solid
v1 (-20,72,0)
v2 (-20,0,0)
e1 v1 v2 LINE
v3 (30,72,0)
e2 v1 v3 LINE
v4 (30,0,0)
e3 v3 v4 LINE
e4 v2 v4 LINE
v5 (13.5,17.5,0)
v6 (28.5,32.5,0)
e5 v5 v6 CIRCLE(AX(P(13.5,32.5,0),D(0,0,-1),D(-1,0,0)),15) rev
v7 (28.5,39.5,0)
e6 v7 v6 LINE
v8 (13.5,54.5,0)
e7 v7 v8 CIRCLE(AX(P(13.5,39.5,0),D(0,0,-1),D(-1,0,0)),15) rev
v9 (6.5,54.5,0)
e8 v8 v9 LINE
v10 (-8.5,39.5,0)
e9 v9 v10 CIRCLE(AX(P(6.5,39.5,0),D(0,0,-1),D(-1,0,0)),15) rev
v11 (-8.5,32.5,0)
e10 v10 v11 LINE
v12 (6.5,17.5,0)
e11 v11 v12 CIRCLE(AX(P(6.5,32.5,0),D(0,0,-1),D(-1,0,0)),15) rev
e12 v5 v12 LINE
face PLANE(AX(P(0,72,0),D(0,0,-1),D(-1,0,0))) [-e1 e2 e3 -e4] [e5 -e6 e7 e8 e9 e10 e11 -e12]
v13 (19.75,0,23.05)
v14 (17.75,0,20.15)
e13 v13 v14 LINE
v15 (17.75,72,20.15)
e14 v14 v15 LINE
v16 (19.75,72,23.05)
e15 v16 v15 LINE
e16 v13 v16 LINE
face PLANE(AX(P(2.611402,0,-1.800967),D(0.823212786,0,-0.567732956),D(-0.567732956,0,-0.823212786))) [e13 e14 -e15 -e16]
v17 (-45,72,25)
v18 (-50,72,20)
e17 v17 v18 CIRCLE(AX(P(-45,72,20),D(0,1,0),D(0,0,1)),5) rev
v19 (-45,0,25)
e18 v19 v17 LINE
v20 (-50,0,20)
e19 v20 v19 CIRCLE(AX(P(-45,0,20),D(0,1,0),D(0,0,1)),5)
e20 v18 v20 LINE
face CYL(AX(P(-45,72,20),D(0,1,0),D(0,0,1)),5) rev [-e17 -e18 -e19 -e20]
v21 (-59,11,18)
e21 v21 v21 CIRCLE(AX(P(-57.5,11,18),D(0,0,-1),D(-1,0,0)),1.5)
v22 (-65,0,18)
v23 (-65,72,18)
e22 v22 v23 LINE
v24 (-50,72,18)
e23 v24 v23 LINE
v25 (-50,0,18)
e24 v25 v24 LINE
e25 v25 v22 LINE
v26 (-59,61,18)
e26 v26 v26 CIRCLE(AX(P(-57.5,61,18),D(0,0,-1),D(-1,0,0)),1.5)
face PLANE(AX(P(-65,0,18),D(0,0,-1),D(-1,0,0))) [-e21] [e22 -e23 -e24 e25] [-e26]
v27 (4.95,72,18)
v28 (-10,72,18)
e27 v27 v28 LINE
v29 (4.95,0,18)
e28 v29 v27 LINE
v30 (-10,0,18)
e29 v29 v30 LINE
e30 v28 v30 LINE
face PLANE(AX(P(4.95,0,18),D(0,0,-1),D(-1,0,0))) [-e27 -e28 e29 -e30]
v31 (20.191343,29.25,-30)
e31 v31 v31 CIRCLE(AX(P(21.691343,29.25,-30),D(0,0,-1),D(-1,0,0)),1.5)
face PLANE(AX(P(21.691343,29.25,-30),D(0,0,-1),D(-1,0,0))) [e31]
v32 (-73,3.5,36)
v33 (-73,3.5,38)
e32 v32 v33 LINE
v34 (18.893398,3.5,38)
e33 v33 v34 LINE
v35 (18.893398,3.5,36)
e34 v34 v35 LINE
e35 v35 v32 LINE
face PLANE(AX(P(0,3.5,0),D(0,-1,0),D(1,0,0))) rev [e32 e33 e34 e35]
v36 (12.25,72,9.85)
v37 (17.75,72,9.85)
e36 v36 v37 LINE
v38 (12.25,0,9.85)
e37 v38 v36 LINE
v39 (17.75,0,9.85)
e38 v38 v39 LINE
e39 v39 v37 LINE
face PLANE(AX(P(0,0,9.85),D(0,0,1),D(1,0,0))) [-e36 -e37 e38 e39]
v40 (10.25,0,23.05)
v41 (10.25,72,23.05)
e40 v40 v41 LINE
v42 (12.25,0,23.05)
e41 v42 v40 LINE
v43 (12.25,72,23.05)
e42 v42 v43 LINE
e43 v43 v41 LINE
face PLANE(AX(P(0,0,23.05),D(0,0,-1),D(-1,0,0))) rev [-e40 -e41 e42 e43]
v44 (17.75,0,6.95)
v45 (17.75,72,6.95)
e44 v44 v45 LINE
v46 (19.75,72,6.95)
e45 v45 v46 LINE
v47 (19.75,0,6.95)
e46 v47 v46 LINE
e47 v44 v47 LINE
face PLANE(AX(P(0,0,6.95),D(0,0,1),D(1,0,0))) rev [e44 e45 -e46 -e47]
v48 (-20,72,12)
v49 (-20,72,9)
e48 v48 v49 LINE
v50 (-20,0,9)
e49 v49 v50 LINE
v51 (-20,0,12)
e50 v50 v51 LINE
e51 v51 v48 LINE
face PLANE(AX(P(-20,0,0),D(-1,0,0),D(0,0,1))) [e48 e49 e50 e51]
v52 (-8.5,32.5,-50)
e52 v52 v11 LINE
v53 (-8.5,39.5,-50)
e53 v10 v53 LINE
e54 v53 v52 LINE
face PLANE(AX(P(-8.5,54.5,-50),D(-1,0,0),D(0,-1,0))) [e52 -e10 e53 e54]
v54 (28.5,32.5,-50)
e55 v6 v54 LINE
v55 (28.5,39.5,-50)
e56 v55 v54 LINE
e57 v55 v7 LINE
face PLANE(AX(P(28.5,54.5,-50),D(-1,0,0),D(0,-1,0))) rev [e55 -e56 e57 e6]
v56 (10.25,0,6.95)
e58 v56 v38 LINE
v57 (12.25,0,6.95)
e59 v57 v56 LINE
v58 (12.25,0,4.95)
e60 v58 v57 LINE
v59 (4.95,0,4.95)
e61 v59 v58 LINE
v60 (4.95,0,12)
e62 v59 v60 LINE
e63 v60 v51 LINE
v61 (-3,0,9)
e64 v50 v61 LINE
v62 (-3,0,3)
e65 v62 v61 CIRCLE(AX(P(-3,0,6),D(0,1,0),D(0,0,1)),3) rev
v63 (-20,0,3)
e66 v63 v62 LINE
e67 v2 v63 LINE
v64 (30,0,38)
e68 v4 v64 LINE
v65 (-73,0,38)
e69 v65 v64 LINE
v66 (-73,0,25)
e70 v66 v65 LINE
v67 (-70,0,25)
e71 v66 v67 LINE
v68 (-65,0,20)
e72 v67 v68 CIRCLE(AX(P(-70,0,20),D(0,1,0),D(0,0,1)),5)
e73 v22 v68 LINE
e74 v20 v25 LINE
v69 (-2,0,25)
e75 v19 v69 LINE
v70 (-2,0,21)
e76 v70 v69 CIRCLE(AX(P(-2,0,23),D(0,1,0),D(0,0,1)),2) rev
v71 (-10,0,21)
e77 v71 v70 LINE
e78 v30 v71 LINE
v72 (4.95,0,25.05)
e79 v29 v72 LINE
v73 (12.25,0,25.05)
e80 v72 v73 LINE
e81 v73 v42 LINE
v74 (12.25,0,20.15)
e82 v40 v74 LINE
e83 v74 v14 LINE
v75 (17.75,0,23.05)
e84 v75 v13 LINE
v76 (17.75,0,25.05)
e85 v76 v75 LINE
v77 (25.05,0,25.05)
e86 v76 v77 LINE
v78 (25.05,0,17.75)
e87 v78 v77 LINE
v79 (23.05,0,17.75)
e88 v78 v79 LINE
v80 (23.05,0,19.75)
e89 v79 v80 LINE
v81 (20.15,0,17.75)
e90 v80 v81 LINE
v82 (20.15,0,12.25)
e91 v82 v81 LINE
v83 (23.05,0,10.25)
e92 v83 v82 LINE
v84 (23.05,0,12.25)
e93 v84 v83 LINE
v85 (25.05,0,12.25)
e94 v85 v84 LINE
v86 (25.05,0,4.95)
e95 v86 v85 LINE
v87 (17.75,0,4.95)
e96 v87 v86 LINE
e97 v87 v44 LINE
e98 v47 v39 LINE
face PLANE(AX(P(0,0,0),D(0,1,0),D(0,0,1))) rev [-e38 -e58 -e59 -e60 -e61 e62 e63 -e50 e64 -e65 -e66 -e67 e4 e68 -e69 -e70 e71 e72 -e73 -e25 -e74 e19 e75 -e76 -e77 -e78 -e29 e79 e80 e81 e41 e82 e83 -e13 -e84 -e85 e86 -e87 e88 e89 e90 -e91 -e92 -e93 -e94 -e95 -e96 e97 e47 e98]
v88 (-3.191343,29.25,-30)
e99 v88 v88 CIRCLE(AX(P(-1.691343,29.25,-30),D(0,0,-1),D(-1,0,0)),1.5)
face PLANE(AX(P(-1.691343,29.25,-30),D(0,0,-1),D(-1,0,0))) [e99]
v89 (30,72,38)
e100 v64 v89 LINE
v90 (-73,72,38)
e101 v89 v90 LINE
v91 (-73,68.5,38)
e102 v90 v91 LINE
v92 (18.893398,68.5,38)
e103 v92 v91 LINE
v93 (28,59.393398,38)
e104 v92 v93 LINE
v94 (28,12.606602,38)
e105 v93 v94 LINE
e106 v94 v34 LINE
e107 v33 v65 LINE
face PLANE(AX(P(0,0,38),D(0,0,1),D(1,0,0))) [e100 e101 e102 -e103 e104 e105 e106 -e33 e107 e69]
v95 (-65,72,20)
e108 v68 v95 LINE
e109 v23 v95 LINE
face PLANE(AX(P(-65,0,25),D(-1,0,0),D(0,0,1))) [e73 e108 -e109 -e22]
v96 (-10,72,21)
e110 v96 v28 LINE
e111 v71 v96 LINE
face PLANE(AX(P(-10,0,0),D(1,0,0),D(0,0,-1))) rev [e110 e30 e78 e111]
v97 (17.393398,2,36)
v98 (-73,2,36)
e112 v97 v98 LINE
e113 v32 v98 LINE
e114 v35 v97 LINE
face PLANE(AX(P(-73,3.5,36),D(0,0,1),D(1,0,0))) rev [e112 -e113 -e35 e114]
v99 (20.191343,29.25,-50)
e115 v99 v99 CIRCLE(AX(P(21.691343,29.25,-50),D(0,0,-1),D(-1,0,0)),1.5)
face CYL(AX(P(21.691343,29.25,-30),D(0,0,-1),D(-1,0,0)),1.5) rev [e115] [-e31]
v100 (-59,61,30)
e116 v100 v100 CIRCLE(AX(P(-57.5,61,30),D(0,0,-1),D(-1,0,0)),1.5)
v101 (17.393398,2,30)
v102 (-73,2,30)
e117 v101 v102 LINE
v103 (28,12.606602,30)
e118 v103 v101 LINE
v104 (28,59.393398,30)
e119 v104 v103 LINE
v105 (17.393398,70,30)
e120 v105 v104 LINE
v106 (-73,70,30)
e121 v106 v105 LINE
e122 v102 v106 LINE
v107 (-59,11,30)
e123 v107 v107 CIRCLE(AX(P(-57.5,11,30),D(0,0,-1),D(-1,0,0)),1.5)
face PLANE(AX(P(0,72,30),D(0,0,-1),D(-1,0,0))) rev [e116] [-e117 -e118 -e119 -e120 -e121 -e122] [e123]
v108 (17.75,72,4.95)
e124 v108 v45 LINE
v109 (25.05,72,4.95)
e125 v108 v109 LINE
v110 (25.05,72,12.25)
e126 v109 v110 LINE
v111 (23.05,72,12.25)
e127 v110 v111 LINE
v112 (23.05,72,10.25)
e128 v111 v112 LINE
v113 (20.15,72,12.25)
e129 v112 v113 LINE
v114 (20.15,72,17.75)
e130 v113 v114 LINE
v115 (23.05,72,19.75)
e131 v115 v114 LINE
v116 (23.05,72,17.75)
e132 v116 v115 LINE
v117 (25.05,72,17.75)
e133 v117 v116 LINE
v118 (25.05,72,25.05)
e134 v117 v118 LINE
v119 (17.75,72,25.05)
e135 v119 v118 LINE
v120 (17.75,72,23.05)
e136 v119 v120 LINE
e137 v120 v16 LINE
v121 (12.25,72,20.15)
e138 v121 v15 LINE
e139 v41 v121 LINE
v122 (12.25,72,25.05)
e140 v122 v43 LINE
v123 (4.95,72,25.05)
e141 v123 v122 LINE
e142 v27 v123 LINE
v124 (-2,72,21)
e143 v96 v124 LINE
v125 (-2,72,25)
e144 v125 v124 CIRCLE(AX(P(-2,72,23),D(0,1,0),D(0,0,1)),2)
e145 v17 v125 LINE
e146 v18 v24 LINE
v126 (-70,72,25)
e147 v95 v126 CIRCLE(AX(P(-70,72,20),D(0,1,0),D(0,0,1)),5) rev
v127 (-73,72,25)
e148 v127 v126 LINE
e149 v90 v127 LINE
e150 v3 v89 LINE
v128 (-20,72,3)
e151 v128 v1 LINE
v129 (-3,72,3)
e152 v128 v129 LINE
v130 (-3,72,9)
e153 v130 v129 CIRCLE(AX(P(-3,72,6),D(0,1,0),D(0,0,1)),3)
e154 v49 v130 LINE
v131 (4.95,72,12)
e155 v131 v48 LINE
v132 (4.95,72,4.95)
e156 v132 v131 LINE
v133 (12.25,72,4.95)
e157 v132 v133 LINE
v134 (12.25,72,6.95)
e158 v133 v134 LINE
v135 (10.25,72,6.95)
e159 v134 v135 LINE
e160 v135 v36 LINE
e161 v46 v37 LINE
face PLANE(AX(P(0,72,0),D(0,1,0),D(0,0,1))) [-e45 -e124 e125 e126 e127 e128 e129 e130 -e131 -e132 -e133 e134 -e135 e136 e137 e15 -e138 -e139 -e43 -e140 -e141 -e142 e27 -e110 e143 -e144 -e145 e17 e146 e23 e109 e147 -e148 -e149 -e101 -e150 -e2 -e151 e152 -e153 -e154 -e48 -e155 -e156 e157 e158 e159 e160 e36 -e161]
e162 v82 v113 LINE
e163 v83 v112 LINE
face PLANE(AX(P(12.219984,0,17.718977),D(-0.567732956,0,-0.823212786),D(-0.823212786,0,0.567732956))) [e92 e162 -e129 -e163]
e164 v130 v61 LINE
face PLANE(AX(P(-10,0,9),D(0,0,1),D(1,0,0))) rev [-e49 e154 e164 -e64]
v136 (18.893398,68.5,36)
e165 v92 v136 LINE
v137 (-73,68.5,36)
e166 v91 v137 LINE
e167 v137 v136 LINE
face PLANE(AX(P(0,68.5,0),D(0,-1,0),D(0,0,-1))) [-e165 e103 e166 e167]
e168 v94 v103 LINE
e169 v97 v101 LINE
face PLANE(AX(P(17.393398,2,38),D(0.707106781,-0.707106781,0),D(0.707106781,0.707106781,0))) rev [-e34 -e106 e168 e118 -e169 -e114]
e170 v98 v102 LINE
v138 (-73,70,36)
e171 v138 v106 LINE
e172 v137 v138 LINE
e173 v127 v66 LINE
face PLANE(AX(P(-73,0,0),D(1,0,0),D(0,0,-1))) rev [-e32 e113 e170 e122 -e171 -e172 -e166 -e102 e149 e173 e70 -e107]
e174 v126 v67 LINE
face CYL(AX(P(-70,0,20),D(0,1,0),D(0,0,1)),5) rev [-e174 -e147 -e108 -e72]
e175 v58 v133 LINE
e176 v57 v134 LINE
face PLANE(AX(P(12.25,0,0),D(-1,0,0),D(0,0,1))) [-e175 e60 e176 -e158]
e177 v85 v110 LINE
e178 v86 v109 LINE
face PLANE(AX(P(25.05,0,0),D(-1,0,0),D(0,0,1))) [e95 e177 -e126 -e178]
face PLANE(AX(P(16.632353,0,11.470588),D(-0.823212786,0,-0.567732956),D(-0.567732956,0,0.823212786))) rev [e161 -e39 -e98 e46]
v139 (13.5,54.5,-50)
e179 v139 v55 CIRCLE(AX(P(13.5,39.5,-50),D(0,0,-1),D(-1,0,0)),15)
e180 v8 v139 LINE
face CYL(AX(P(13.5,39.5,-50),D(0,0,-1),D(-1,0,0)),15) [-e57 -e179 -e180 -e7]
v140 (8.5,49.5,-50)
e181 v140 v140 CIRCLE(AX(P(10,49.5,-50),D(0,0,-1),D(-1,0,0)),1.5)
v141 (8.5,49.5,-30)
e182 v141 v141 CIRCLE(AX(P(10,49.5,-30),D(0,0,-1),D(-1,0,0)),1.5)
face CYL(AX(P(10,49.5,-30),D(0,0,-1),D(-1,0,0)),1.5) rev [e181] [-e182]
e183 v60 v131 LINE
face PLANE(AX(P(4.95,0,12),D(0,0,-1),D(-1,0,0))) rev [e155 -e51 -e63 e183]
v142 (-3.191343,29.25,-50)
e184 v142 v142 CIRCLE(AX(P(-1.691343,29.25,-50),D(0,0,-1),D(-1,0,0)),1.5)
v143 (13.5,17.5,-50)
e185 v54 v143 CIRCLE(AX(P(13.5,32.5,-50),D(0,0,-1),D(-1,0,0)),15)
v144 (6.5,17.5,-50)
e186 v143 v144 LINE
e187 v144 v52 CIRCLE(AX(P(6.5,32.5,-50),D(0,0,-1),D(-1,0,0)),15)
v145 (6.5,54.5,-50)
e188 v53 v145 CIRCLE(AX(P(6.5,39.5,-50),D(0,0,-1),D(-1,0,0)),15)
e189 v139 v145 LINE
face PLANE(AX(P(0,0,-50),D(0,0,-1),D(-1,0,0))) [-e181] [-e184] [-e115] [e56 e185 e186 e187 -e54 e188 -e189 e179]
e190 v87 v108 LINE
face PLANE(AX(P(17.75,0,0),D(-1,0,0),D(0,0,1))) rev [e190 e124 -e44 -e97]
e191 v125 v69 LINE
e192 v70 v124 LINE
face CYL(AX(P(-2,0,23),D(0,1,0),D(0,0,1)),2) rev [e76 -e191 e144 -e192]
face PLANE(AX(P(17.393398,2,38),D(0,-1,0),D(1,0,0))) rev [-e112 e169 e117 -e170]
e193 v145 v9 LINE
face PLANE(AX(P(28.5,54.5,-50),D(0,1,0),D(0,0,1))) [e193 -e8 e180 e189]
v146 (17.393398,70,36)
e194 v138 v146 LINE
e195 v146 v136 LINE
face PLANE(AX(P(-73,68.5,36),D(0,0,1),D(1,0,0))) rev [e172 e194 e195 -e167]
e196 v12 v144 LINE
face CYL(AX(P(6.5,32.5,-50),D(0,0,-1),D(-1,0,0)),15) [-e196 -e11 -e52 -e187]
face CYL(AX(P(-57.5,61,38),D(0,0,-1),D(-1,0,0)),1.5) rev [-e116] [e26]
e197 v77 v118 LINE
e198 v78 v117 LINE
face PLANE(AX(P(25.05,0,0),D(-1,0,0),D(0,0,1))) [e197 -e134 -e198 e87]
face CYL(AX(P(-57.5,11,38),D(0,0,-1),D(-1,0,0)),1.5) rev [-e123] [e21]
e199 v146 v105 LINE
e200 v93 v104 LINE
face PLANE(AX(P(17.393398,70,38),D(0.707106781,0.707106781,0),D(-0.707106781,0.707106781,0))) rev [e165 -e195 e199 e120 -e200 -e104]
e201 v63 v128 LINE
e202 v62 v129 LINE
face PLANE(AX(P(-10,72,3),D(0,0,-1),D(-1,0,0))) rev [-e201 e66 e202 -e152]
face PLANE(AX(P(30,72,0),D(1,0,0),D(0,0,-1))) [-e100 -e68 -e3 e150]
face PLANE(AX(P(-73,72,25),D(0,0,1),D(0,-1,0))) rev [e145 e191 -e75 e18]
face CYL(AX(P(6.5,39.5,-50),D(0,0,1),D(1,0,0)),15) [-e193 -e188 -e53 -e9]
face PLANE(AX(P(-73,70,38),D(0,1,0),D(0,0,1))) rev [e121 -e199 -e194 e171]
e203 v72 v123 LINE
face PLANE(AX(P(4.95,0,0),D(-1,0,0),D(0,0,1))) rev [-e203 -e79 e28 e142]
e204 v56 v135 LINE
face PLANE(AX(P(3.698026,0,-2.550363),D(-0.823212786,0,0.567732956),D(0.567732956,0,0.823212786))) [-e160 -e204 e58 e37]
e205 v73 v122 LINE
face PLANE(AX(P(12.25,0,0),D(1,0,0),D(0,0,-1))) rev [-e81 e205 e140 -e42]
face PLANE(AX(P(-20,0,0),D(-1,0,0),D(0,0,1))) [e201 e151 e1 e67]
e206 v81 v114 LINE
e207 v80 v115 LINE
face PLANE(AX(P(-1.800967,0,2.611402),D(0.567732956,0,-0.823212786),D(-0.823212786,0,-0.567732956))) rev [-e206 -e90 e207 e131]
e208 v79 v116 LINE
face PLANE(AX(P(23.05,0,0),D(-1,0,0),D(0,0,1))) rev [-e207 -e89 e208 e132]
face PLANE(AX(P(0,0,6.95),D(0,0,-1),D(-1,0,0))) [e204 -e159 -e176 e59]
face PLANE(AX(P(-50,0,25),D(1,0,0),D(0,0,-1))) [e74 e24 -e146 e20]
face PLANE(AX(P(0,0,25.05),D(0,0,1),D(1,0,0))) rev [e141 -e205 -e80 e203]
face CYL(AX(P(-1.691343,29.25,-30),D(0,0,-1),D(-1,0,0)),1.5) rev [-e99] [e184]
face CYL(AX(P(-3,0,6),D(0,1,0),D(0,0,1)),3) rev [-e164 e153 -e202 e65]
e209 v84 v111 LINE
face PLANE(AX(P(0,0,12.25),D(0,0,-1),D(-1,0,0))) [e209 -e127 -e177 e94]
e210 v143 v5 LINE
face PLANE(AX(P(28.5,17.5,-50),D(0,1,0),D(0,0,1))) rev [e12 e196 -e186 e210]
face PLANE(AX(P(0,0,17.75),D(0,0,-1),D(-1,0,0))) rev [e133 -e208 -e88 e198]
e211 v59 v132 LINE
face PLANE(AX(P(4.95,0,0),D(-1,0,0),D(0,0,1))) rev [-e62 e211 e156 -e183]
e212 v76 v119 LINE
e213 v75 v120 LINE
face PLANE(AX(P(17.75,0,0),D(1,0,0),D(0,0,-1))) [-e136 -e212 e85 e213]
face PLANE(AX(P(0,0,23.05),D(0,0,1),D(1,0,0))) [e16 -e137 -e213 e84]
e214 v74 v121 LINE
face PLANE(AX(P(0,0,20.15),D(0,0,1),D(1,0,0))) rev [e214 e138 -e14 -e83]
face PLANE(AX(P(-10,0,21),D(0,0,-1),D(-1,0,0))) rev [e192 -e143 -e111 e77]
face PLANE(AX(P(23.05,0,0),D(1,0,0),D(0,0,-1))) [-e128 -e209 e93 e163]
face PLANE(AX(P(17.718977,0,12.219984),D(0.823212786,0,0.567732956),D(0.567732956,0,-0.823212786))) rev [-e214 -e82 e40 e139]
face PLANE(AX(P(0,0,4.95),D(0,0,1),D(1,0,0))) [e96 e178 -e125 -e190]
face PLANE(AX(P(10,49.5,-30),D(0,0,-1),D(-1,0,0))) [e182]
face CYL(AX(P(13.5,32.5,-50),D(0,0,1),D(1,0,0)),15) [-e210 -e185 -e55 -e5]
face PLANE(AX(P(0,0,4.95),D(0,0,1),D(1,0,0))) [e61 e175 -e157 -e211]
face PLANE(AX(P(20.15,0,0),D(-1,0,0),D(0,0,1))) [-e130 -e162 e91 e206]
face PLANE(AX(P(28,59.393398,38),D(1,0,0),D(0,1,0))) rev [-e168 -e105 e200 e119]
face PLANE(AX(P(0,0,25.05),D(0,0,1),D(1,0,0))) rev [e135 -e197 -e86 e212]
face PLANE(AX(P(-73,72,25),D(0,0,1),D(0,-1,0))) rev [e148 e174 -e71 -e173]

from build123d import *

# Parameters (mm, degrees)
SKETCH5_W            = 30
SKETCH5_H            = 30
BOSS_EXTRUDE3_DEPTH  = 72
CUT_EXTRUDE1_DEPTH   = 84.570329663
SKETCH8_W            = 4.95
SKETCH8_H            = 6
CUT_EXTRUDE3_DEPTH   = 84.570329663
SKETCH10_W           = 3
SKETCH10_H           = 72
BOSS_EXTRUDE4_DEPTH  = 10
SKETCH11_W           = 37
SKETCH11_H           = 37
BOSS_EXTRUDE5_DEPTH  = 50
SKETCH14_R           = 1.5
CUT_EXTRUDE4_DEPTH   = 20
FILLET2_R            = 15
SKETCH16_W           = 5
SKETCH16_H           = 72
BOSS_EXTRUDE6_DEPTH  = 73
BOSS_EXTRUDE7_DEPTH  = 8
SKETCH20_W           = 103
SKETCH20_H           = 2
BOSS_EXTRUDE8_DEPTH  = 1.5
SKETCH21_W           = 103
SKETCH21_H           = 2
BOSS_EXTRUDE9_DEPTH  = 1.5
SKETCH22_W           = 15
SKETCH22_H           = 7
BOSS_EXTRUDE10_DEPTH = 72
FILLET4_R            = 5
FILLET5_R            = 3
FILLET6_R            = 2
SKETCH23_R           = 1.5
CUT_EXTRUDE5_DEPTH   = 124.032516027
SKETCH24_W           = 3
SKETCH24_H           = 72
BOSS_EXTRUDE11_DEPTH = 10


with BuildPart() as part:
    # Sketch5 → Boss-Extrude3 (new body)
    with BuildSketch(Plane(origin=(0, 0, 0), x_dir=(1, 0, 0), z_dir=(0, 1, 0))):
        with Locations((15, -15)):
            Rectangle(SKETCH5_W, SKETCH5_H)
    extrude(amount=BOSS_EXTRUDE3_DEPTH)

    # Sketch6 → Cut-Extrude1 (cut, through all)
    with BuildSketch(Plane(origin=(0, 72, 0), x_dir=(1, 0, 0), z_dir=(0, 1, 0))):
        Polygon((12.25, -4.95), (4.95, -4.95), (4.95, -15), (20.15, -15), (20.15, -12.25), (23.05, -10.25), (23.05, -12.25), (25.05, -12.25), (25.05, -4.95), (17.75, -4.95), (17.75, -6.95), (19.75, -6.95), (17.75, -9.85), (12.25, -9.85), (10.25, -6.95), (12.25, -6.95), align=None)
        Polygon((20.15, -15), (4.95, -15), (4.95, -25.05), (12.25, -25.05), (12.25, -23.05), (10.25, -23.05), (12.25, -20.15), (17.75, -20.15), (19.75, -23.05), (17.75, -23.05), (17.75, -25.05), (25.05, -25.05), (25.05, -17.75), (23.05, -17.75), (23.05, -19.75), (20.15, -17.75), align=None)
    extrude(amount=-CUT_EXTRUDE1_DEPTH, mode=Mode.SUBTRACT)

    # Sketch8 → Cut-Extrude3 (cut, through all)
    with BuildSketch(Plane(origin=(0, 72, 0), x_dir=(1, 0, 0), z_dir=(0, 1, 0))):
        with Locations((2.475, -15)):
            Rectangle(SKETCH8_W, SKETCH8_H)
    extrude(amount=-CUT_EXTRUDE3_DEPTH, mode=Mode.SUBTRACT)

    # Sketch10 → Boss-Extrude4 (add)
    with BuildSketch(Plane.ZY):
        with Locations((1.5, 36)):
            Rectangle(SKETCH10_W, SKETCH10_H)
        with Locations((10.5, 36)):
            Rectangle(SKETCH10_W, SKETCH10_H)
        with Locations((19.5, 36)):
            Rectangle(SKETCH10_W, SKETCH10_H)
    extrude(amount=BOSS_EXTRUDE4_DEPTH)

    # Sketch11 → Boss-Extrude5 (add)
    with BuildSketch(Plane(origin=(0, 0, 0), x_dir=(-1, 0, 0), z_dir=(0, 0, -1))):
        with Locations((-10, 36)):
            Rectangle(SKETCH11_W, SKETCH11_H)
    extrude(amount=BOSS_EXTRUDE5_DEPTH)

    # Sketch14 → Cut-Extrude4 (cut)
    with BuildSketch(Plane(origin=(0, 0, -50), x_dir=(-1, 0, 0), z_dir=(0, 0, -1))):
        with Locations((-10, 49.5)):
            Circle(SKETCH14_R)
        with Locations((1.691342951, 29.25)):
            Circle(SKETCH14_R)
        with Locations((-21.691342951, 29.25)):
            Circle(SKETCH14_R)
    extrude(amount=-CUT_EXTRUDE4_DEPTH, mode=Mode.SUBTRACT)

    # Fillet2
    fillet2_edges = [part.edges().sort_by_distance(p)[0] for p in [
        (28.5, 54.5, -25),
        (28.5, 17.5, -25),
        (-8.5, 17.5, -25),
        (-8.5, 54.5, -25),
    ]]
    fillet(fillet2_edges, radius=FILLET2_R)

    # Sketch16 → Boss-Extrude6 (add)
    with BuildSketch(Plane.ZY):
        with Locations((27.5, 36)):
            Rectangle(SKETCH16_W, SKETCH16_H)
    extrude(amount=BOSS_EXTRUDE6_DEPTH)

    # Sketch19 → Boss-Extrude7 (add)
    with BuildSketch(Plane.XY.offset(30)):
        Polygon((-73, 72), (-73, 70), (17.393398282, 70), (28, 59.393398282), (28, 12.606601718), (17.393398282, 2), (-73, 2), (-73, 0), (30, 0), (30, 72), align=None)
    extrude(amount=BOSS_EXTRUDE7_DEPTH)

    # Sketch20 → Boss-Extrude8 (add)
    with BuildSketch(Plane.XZ.offset(-70)):
        with Locations((-21.5, 37)):
            Rectangle(SKETCH20_W, SKETCH20_H)
    extrude(amount=BOSS_EXTRUDE8_DEPTH)

    # Sketch21 → Boss-Extrude9 (add)
    with BuildSketch(Plane(origin=(0, 2, 0), x_dir=(1, 0, 0), z_dir=(0, 1, 0))):
        with Locations((-21.5, -37)):
            Rectangle(SKETCH21_W, SKETCH21_H)
    extrude(amount=BOSS_EXTRUDE9_DEPTH)

    # Sketch22 → Boss-Extrude10 (add)
    with BuildSketch(Plane(origin=(0, 72, 0), x_dir=(1, 0, 0), z_dir=(0, 1, 0))):
        with Locations((-57.5, -21.5)):
            Rectangle(SKETCH22_W, SKETCH22_H)
    extrude(amount=-BOSS_EXTRUDE10_DEPTH)

    # Fillet4
    fillet4_edges = [part.edges().sort_by_distance(p)[0] for p in [
        (-65, 36, 25),
        (-50, 36, 25),
    ]]
    fillet(fillet4_edges, radius=FILLET4_R)

    # Fillet5
    fillet5_edges = [part.edges().sort_by_distance(p)[0] for p in [
        (0, 36, 3),
        (0, 36, 9),
    ]]
    fillet(fillet5_edges, radius=FILLET5_R - 0.0001)  # a hair under: the kernel refuses the full size

    # Fillet6
    fillet6_edges = [part.edges().sort_by_distance(p)[0] for p in [
        (0, 36, 21),
        (0, 36, 25),
    ]]
    fillet(fillet6_edges, radius=FILLET6_R - 0.0001)  # a hair under: the kernel refuses the full size

    # Sketch23 → Cut-Extrude5 (cut, through all)
    with BuildSketch(Plane(origin=(0, 0, 18), x_dir=(-1, 0, 0), z_dir=(0, 0, -1))):
        with Locations((57.5, 61)):
            Circle(SKETCH23_R)
        with Locations((57.5, 11)):
            Circle(SKETCH23_R)
    extrude(amount=-CUT_EXTRUDE5_DEPTH, mode=Mode.SUBTRACT)

    # Sketch24 → Boss-Extrude11 (add)
    with BuildSketch(Plane.ZY.offset(10)):
        with Locations((1.5, 36)):
            Rectangle(SKETCH24_W, SKETCH24_H)
        with Locations((10.5, 36)):
            Rectangle(SKETCH24_W, SKETCH24_H)
    extrude(amount=BOSS_EXTRUDE11_DEPTH)


solid = part.part
